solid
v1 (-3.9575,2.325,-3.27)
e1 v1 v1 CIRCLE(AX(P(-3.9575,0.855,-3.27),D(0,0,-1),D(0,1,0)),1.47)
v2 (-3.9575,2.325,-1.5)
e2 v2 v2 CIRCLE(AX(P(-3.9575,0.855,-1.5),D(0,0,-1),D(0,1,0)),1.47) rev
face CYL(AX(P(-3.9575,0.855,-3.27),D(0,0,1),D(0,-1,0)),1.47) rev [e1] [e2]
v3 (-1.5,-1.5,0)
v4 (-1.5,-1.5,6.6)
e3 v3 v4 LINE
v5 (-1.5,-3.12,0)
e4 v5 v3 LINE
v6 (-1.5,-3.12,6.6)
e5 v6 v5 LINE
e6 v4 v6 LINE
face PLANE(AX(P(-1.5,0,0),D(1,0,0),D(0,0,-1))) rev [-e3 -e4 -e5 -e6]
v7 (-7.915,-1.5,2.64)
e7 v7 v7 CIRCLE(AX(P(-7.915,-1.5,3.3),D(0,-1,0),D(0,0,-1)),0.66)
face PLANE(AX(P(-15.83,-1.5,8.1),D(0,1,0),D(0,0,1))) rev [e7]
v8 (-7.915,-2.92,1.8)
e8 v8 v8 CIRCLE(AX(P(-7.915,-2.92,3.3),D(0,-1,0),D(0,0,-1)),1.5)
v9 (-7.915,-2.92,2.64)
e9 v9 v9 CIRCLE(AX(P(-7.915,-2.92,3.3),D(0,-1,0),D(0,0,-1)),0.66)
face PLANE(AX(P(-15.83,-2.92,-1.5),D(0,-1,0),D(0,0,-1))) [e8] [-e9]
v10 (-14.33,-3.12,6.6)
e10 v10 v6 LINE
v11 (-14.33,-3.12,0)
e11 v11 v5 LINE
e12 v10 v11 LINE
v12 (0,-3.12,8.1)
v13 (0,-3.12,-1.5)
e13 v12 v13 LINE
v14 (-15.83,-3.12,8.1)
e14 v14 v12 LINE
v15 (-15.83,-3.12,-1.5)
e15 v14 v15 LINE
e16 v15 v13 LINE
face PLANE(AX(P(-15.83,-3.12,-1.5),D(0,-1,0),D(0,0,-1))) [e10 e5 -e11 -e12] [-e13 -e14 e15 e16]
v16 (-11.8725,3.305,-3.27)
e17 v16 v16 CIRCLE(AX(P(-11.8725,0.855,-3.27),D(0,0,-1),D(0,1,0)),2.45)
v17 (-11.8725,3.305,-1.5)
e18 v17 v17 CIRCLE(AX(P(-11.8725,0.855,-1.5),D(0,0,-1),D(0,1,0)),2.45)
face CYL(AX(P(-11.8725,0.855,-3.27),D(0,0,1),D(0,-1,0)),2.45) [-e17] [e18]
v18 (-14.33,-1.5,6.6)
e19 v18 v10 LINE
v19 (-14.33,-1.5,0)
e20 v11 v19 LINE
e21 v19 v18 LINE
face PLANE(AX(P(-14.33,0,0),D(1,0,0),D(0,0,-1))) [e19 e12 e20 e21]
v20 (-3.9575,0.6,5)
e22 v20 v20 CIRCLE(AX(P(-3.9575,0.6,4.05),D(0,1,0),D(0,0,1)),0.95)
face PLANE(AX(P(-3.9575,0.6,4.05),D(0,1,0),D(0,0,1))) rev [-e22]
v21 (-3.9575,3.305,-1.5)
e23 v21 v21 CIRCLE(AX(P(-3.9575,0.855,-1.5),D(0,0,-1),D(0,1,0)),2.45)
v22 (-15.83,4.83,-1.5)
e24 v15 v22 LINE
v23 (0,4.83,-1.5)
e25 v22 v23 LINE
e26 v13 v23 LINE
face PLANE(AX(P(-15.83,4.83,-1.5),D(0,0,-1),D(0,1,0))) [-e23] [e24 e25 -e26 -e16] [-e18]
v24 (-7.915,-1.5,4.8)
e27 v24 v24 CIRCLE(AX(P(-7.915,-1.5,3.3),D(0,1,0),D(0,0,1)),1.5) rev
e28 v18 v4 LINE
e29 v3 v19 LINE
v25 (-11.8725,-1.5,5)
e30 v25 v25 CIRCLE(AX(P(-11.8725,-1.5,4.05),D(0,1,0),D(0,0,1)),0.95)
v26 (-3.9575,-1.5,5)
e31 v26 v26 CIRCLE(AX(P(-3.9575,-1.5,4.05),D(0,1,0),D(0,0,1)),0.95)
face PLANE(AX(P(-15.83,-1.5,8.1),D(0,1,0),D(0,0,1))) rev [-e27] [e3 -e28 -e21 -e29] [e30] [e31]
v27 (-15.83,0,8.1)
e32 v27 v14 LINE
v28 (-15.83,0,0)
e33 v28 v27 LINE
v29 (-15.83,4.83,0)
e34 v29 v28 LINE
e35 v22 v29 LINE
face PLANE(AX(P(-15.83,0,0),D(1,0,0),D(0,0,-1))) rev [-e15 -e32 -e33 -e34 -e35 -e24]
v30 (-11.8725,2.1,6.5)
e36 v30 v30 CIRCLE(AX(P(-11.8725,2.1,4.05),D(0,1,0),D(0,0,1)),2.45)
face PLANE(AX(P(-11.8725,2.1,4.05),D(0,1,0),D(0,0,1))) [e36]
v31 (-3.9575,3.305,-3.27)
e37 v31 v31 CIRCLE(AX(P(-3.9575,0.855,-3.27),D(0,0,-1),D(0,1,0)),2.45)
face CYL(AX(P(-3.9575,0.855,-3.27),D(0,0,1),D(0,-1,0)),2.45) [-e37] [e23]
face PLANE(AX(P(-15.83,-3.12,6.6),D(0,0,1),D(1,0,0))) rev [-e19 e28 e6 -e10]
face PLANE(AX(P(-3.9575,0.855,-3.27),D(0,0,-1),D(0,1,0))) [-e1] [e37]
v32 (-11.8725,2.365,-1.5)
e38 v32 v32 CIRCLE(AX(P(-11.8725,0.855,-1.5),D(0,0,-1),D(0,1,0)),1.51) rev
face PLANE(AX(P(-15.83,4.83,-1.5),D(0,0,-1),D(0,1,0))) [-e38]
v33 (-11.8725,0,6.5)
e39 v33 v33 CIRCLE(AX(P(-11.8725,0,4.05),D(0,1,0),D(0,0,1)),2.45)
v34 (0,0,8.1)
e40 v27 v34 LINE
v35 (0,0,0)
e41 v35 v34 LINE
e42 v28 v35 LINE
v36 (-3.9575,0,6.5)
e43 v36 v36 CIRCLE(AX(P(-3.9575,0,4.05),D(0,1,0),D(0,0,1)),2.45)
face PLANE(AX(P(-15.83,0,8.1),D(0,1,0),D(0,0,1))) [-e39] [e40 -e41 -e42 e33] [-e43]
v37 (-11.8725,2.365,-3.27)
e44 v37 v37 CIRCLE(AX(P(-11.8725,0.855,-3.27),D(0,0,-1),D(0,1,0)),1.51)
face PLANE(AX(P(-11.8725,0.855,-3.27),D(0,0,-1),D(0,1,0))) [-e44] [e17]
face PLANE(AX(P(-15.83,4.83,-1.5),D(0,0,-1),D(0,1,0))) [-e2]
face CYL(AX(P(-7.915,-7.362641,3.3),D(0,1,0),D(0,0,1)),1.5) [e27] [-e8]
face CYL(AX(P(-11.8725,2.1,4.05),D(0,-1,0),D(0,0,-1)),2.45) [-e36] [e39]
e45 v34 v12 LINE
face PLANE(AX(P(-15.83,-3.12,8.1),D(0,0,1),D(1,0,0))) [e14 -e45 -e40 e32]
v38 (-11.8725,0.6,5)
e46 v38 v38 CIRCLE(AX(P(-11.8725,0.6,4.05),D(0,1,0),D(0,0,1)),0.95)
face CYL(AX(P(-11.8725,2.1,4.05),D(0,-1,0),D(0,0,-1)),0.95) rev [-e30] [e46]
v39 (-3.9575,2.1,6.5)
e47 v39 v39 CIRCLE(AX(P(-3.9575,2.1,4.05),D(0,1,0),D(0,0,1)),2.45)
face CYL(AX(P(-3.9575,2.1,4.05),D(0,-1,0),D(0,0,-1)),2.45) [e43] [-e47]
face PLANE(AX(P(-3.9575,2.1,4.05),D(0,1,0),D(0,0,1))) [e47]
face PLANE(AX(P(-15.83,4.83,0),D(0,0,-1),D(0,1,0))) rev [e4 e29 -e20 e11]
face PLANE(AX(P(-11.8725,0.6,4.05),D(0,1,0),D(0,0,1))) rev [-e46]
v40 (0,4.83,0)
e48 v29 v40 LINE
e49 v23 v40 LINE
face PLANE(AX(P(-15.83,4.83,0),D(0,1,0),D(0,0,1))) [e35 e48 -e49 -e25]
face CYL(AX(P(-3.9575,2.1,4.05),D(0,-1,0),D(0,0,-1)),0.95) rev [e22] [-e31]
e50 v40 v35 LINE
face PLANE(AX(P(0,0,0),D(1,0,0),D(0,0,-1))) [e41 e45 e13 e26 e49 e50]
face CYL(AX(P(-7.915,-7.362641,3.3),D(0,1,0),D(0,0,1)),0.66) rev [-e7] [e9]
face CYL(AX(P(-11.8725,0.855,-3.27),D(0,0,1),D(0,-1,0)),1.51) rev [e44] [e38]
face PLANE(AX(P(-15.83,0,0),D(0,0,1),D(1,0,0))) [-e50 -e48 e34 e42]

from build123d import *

# Parameters (mm, degrees)
BOSS_EXTRUDE1_DEPTH = 15.83
SKETCH2_R           = 2.45
BOSS_EXTRUDE2_DEPTH = 2.1
SHELL1_START        = -3.12
SHELL1_OUTLINE_W    = 12.83
SHELL1_OUTLINE_H    = 6.6
SHELL1_DEPTH        = 1.62
SHELL1_START_2      = -1.5
SHELL1_2_OUTLINE_R  = 0.95
SHELL1_2_DEPTH      = 2.1
SKETCH3_R           = 2.45
SKETCH3_R_2         = 1.47
SKETCH3_R_3         = 1.51
BOSS_EXTRUDE3_DEPTH = 1.77
SKETCH4_R           = 1.5
SKETCH4_R_2         = 0.66
BOSS_EXTRUDE4_DEPTH = 1.42


# Read off the part's stored shape, not the designer's step: Shell1
with BuildPart() as part:
    # Sketch1 → Boss-Extrude1 (new body)
    with BuildSketch(Plane(origin=(0, 0, 0), x_dir=(0, 0, -1), z_dir=(1, 0, 0))):
        Polygon((0, 0), (0, 4.83), (1.5, 4.83), (1.5, -3.12), (-8.1, -3.12), (-8.1, 0), align=None)
    extrude(amount=-BOSS_EXTRUDE1_DEPTH)

    # Sketch2 → Boss-Extrude2 (add)
    with BuildSketch(Plane(origin=(0, 0, 0), x_dir=(1, 0, 0), z_dir=(0, 1, 0))):
        with Locations(Location((-11.8725, -4.05, 0), (0, 0, 270))):
            Circle(SKETCH2_R)
        with Locations(Location((-3.9575, -4.05, 0), (0, 0, 270))):
            Circle(SKETCH2_R)
    extrude(amount=BOSS_EXTRUDE2_DEPTH)

    # Shell1 outline → Shell1 (cut)
    with BuildSketch(Plane(origin=(0, 0, 0), x_dir=(1, 0, 0), z_dir=(0, 1, 0)).offset(SHELL1_START)):
        with Locations((-7.915, -3.3)):
            Rectangle(SHELL1_OUTLINE_W, SHELL1_OUTLINE_H)
    extrude(amount=SHELL1_DEPTH, mode=Mode.SUBTRACT)

    # Shell1 2 outline → Shell1 2 (cut)
    with BuildSketch(Plane(origin=(0, 0, 0), x_dir=(1, 0, 0), z_dir=(0, 1, 0)).offset(SHELL1_START_2)):
        with Locations((-11.8725, -4.05)):
            Circle(SHELL1_2_OUTLINE_R)
        with Locations((-3.9575, -4.05)):
            Circle(SHELL1_2_OUTLINE_R)
    extrude(amount=SHELL1_2_DEPTH, mode=Mode.SUBTRACT)

    # Sketch3 → Boss-Extrude3 (add)
    # profile 1 of 2: a face of its own
    with BuildSketch(Plane(origin=(0, 0, -1.5), x_dir=(-1, 0, 0), z_dir=(0, 0, -1))):
        with Locations(Location((3.9575, 0.855, 0), (0, 0, 90))):
            Circle(SKETCH3_R)
        with Locations(Location((3.9575, 0.855, 0), (0, 0, 90))):
            Circle(SKETCH3_R_2, mode=Mode.SUBTRACT)
    # profile 2 of 2: a face of its own
    with BuildSketch(Plane(origin=(0, 0, -1.5), x_dir=(-1, 0, 0), z_dir=(0, 0, -1))):
        with Locations(Location((11.8725, 0.855, 0), (0, 0, 90))):
            Circle(SKETCH3_R)
        with Locations(Location((11.8725, 0.855, 0), (0, 0, 90))):
            Circle(SKETCH3_R_3, mode=Mode.SUBTRACT)
    extrude(amount=BOSS_EXTRUDE3_DEPTH)

    # Sketch4 → Boss-Extrude4 (add)
    with BuildSketch(Plane.XZ.offset(1.5)):
        with Locations(Location((-7.915, 3.3, 0), (0, 0, 90))):
            Circle(SKETCH4_R)
        with Locations(Location((-7.915, 3.3, 0), (0, 0, 270))):
            Circle(SKETCH4_R_2, mode=Mode.SUBTRACT)
    extrude(amount=BOSS_EXTRUDE4_DEPTH)


solid = part.part
